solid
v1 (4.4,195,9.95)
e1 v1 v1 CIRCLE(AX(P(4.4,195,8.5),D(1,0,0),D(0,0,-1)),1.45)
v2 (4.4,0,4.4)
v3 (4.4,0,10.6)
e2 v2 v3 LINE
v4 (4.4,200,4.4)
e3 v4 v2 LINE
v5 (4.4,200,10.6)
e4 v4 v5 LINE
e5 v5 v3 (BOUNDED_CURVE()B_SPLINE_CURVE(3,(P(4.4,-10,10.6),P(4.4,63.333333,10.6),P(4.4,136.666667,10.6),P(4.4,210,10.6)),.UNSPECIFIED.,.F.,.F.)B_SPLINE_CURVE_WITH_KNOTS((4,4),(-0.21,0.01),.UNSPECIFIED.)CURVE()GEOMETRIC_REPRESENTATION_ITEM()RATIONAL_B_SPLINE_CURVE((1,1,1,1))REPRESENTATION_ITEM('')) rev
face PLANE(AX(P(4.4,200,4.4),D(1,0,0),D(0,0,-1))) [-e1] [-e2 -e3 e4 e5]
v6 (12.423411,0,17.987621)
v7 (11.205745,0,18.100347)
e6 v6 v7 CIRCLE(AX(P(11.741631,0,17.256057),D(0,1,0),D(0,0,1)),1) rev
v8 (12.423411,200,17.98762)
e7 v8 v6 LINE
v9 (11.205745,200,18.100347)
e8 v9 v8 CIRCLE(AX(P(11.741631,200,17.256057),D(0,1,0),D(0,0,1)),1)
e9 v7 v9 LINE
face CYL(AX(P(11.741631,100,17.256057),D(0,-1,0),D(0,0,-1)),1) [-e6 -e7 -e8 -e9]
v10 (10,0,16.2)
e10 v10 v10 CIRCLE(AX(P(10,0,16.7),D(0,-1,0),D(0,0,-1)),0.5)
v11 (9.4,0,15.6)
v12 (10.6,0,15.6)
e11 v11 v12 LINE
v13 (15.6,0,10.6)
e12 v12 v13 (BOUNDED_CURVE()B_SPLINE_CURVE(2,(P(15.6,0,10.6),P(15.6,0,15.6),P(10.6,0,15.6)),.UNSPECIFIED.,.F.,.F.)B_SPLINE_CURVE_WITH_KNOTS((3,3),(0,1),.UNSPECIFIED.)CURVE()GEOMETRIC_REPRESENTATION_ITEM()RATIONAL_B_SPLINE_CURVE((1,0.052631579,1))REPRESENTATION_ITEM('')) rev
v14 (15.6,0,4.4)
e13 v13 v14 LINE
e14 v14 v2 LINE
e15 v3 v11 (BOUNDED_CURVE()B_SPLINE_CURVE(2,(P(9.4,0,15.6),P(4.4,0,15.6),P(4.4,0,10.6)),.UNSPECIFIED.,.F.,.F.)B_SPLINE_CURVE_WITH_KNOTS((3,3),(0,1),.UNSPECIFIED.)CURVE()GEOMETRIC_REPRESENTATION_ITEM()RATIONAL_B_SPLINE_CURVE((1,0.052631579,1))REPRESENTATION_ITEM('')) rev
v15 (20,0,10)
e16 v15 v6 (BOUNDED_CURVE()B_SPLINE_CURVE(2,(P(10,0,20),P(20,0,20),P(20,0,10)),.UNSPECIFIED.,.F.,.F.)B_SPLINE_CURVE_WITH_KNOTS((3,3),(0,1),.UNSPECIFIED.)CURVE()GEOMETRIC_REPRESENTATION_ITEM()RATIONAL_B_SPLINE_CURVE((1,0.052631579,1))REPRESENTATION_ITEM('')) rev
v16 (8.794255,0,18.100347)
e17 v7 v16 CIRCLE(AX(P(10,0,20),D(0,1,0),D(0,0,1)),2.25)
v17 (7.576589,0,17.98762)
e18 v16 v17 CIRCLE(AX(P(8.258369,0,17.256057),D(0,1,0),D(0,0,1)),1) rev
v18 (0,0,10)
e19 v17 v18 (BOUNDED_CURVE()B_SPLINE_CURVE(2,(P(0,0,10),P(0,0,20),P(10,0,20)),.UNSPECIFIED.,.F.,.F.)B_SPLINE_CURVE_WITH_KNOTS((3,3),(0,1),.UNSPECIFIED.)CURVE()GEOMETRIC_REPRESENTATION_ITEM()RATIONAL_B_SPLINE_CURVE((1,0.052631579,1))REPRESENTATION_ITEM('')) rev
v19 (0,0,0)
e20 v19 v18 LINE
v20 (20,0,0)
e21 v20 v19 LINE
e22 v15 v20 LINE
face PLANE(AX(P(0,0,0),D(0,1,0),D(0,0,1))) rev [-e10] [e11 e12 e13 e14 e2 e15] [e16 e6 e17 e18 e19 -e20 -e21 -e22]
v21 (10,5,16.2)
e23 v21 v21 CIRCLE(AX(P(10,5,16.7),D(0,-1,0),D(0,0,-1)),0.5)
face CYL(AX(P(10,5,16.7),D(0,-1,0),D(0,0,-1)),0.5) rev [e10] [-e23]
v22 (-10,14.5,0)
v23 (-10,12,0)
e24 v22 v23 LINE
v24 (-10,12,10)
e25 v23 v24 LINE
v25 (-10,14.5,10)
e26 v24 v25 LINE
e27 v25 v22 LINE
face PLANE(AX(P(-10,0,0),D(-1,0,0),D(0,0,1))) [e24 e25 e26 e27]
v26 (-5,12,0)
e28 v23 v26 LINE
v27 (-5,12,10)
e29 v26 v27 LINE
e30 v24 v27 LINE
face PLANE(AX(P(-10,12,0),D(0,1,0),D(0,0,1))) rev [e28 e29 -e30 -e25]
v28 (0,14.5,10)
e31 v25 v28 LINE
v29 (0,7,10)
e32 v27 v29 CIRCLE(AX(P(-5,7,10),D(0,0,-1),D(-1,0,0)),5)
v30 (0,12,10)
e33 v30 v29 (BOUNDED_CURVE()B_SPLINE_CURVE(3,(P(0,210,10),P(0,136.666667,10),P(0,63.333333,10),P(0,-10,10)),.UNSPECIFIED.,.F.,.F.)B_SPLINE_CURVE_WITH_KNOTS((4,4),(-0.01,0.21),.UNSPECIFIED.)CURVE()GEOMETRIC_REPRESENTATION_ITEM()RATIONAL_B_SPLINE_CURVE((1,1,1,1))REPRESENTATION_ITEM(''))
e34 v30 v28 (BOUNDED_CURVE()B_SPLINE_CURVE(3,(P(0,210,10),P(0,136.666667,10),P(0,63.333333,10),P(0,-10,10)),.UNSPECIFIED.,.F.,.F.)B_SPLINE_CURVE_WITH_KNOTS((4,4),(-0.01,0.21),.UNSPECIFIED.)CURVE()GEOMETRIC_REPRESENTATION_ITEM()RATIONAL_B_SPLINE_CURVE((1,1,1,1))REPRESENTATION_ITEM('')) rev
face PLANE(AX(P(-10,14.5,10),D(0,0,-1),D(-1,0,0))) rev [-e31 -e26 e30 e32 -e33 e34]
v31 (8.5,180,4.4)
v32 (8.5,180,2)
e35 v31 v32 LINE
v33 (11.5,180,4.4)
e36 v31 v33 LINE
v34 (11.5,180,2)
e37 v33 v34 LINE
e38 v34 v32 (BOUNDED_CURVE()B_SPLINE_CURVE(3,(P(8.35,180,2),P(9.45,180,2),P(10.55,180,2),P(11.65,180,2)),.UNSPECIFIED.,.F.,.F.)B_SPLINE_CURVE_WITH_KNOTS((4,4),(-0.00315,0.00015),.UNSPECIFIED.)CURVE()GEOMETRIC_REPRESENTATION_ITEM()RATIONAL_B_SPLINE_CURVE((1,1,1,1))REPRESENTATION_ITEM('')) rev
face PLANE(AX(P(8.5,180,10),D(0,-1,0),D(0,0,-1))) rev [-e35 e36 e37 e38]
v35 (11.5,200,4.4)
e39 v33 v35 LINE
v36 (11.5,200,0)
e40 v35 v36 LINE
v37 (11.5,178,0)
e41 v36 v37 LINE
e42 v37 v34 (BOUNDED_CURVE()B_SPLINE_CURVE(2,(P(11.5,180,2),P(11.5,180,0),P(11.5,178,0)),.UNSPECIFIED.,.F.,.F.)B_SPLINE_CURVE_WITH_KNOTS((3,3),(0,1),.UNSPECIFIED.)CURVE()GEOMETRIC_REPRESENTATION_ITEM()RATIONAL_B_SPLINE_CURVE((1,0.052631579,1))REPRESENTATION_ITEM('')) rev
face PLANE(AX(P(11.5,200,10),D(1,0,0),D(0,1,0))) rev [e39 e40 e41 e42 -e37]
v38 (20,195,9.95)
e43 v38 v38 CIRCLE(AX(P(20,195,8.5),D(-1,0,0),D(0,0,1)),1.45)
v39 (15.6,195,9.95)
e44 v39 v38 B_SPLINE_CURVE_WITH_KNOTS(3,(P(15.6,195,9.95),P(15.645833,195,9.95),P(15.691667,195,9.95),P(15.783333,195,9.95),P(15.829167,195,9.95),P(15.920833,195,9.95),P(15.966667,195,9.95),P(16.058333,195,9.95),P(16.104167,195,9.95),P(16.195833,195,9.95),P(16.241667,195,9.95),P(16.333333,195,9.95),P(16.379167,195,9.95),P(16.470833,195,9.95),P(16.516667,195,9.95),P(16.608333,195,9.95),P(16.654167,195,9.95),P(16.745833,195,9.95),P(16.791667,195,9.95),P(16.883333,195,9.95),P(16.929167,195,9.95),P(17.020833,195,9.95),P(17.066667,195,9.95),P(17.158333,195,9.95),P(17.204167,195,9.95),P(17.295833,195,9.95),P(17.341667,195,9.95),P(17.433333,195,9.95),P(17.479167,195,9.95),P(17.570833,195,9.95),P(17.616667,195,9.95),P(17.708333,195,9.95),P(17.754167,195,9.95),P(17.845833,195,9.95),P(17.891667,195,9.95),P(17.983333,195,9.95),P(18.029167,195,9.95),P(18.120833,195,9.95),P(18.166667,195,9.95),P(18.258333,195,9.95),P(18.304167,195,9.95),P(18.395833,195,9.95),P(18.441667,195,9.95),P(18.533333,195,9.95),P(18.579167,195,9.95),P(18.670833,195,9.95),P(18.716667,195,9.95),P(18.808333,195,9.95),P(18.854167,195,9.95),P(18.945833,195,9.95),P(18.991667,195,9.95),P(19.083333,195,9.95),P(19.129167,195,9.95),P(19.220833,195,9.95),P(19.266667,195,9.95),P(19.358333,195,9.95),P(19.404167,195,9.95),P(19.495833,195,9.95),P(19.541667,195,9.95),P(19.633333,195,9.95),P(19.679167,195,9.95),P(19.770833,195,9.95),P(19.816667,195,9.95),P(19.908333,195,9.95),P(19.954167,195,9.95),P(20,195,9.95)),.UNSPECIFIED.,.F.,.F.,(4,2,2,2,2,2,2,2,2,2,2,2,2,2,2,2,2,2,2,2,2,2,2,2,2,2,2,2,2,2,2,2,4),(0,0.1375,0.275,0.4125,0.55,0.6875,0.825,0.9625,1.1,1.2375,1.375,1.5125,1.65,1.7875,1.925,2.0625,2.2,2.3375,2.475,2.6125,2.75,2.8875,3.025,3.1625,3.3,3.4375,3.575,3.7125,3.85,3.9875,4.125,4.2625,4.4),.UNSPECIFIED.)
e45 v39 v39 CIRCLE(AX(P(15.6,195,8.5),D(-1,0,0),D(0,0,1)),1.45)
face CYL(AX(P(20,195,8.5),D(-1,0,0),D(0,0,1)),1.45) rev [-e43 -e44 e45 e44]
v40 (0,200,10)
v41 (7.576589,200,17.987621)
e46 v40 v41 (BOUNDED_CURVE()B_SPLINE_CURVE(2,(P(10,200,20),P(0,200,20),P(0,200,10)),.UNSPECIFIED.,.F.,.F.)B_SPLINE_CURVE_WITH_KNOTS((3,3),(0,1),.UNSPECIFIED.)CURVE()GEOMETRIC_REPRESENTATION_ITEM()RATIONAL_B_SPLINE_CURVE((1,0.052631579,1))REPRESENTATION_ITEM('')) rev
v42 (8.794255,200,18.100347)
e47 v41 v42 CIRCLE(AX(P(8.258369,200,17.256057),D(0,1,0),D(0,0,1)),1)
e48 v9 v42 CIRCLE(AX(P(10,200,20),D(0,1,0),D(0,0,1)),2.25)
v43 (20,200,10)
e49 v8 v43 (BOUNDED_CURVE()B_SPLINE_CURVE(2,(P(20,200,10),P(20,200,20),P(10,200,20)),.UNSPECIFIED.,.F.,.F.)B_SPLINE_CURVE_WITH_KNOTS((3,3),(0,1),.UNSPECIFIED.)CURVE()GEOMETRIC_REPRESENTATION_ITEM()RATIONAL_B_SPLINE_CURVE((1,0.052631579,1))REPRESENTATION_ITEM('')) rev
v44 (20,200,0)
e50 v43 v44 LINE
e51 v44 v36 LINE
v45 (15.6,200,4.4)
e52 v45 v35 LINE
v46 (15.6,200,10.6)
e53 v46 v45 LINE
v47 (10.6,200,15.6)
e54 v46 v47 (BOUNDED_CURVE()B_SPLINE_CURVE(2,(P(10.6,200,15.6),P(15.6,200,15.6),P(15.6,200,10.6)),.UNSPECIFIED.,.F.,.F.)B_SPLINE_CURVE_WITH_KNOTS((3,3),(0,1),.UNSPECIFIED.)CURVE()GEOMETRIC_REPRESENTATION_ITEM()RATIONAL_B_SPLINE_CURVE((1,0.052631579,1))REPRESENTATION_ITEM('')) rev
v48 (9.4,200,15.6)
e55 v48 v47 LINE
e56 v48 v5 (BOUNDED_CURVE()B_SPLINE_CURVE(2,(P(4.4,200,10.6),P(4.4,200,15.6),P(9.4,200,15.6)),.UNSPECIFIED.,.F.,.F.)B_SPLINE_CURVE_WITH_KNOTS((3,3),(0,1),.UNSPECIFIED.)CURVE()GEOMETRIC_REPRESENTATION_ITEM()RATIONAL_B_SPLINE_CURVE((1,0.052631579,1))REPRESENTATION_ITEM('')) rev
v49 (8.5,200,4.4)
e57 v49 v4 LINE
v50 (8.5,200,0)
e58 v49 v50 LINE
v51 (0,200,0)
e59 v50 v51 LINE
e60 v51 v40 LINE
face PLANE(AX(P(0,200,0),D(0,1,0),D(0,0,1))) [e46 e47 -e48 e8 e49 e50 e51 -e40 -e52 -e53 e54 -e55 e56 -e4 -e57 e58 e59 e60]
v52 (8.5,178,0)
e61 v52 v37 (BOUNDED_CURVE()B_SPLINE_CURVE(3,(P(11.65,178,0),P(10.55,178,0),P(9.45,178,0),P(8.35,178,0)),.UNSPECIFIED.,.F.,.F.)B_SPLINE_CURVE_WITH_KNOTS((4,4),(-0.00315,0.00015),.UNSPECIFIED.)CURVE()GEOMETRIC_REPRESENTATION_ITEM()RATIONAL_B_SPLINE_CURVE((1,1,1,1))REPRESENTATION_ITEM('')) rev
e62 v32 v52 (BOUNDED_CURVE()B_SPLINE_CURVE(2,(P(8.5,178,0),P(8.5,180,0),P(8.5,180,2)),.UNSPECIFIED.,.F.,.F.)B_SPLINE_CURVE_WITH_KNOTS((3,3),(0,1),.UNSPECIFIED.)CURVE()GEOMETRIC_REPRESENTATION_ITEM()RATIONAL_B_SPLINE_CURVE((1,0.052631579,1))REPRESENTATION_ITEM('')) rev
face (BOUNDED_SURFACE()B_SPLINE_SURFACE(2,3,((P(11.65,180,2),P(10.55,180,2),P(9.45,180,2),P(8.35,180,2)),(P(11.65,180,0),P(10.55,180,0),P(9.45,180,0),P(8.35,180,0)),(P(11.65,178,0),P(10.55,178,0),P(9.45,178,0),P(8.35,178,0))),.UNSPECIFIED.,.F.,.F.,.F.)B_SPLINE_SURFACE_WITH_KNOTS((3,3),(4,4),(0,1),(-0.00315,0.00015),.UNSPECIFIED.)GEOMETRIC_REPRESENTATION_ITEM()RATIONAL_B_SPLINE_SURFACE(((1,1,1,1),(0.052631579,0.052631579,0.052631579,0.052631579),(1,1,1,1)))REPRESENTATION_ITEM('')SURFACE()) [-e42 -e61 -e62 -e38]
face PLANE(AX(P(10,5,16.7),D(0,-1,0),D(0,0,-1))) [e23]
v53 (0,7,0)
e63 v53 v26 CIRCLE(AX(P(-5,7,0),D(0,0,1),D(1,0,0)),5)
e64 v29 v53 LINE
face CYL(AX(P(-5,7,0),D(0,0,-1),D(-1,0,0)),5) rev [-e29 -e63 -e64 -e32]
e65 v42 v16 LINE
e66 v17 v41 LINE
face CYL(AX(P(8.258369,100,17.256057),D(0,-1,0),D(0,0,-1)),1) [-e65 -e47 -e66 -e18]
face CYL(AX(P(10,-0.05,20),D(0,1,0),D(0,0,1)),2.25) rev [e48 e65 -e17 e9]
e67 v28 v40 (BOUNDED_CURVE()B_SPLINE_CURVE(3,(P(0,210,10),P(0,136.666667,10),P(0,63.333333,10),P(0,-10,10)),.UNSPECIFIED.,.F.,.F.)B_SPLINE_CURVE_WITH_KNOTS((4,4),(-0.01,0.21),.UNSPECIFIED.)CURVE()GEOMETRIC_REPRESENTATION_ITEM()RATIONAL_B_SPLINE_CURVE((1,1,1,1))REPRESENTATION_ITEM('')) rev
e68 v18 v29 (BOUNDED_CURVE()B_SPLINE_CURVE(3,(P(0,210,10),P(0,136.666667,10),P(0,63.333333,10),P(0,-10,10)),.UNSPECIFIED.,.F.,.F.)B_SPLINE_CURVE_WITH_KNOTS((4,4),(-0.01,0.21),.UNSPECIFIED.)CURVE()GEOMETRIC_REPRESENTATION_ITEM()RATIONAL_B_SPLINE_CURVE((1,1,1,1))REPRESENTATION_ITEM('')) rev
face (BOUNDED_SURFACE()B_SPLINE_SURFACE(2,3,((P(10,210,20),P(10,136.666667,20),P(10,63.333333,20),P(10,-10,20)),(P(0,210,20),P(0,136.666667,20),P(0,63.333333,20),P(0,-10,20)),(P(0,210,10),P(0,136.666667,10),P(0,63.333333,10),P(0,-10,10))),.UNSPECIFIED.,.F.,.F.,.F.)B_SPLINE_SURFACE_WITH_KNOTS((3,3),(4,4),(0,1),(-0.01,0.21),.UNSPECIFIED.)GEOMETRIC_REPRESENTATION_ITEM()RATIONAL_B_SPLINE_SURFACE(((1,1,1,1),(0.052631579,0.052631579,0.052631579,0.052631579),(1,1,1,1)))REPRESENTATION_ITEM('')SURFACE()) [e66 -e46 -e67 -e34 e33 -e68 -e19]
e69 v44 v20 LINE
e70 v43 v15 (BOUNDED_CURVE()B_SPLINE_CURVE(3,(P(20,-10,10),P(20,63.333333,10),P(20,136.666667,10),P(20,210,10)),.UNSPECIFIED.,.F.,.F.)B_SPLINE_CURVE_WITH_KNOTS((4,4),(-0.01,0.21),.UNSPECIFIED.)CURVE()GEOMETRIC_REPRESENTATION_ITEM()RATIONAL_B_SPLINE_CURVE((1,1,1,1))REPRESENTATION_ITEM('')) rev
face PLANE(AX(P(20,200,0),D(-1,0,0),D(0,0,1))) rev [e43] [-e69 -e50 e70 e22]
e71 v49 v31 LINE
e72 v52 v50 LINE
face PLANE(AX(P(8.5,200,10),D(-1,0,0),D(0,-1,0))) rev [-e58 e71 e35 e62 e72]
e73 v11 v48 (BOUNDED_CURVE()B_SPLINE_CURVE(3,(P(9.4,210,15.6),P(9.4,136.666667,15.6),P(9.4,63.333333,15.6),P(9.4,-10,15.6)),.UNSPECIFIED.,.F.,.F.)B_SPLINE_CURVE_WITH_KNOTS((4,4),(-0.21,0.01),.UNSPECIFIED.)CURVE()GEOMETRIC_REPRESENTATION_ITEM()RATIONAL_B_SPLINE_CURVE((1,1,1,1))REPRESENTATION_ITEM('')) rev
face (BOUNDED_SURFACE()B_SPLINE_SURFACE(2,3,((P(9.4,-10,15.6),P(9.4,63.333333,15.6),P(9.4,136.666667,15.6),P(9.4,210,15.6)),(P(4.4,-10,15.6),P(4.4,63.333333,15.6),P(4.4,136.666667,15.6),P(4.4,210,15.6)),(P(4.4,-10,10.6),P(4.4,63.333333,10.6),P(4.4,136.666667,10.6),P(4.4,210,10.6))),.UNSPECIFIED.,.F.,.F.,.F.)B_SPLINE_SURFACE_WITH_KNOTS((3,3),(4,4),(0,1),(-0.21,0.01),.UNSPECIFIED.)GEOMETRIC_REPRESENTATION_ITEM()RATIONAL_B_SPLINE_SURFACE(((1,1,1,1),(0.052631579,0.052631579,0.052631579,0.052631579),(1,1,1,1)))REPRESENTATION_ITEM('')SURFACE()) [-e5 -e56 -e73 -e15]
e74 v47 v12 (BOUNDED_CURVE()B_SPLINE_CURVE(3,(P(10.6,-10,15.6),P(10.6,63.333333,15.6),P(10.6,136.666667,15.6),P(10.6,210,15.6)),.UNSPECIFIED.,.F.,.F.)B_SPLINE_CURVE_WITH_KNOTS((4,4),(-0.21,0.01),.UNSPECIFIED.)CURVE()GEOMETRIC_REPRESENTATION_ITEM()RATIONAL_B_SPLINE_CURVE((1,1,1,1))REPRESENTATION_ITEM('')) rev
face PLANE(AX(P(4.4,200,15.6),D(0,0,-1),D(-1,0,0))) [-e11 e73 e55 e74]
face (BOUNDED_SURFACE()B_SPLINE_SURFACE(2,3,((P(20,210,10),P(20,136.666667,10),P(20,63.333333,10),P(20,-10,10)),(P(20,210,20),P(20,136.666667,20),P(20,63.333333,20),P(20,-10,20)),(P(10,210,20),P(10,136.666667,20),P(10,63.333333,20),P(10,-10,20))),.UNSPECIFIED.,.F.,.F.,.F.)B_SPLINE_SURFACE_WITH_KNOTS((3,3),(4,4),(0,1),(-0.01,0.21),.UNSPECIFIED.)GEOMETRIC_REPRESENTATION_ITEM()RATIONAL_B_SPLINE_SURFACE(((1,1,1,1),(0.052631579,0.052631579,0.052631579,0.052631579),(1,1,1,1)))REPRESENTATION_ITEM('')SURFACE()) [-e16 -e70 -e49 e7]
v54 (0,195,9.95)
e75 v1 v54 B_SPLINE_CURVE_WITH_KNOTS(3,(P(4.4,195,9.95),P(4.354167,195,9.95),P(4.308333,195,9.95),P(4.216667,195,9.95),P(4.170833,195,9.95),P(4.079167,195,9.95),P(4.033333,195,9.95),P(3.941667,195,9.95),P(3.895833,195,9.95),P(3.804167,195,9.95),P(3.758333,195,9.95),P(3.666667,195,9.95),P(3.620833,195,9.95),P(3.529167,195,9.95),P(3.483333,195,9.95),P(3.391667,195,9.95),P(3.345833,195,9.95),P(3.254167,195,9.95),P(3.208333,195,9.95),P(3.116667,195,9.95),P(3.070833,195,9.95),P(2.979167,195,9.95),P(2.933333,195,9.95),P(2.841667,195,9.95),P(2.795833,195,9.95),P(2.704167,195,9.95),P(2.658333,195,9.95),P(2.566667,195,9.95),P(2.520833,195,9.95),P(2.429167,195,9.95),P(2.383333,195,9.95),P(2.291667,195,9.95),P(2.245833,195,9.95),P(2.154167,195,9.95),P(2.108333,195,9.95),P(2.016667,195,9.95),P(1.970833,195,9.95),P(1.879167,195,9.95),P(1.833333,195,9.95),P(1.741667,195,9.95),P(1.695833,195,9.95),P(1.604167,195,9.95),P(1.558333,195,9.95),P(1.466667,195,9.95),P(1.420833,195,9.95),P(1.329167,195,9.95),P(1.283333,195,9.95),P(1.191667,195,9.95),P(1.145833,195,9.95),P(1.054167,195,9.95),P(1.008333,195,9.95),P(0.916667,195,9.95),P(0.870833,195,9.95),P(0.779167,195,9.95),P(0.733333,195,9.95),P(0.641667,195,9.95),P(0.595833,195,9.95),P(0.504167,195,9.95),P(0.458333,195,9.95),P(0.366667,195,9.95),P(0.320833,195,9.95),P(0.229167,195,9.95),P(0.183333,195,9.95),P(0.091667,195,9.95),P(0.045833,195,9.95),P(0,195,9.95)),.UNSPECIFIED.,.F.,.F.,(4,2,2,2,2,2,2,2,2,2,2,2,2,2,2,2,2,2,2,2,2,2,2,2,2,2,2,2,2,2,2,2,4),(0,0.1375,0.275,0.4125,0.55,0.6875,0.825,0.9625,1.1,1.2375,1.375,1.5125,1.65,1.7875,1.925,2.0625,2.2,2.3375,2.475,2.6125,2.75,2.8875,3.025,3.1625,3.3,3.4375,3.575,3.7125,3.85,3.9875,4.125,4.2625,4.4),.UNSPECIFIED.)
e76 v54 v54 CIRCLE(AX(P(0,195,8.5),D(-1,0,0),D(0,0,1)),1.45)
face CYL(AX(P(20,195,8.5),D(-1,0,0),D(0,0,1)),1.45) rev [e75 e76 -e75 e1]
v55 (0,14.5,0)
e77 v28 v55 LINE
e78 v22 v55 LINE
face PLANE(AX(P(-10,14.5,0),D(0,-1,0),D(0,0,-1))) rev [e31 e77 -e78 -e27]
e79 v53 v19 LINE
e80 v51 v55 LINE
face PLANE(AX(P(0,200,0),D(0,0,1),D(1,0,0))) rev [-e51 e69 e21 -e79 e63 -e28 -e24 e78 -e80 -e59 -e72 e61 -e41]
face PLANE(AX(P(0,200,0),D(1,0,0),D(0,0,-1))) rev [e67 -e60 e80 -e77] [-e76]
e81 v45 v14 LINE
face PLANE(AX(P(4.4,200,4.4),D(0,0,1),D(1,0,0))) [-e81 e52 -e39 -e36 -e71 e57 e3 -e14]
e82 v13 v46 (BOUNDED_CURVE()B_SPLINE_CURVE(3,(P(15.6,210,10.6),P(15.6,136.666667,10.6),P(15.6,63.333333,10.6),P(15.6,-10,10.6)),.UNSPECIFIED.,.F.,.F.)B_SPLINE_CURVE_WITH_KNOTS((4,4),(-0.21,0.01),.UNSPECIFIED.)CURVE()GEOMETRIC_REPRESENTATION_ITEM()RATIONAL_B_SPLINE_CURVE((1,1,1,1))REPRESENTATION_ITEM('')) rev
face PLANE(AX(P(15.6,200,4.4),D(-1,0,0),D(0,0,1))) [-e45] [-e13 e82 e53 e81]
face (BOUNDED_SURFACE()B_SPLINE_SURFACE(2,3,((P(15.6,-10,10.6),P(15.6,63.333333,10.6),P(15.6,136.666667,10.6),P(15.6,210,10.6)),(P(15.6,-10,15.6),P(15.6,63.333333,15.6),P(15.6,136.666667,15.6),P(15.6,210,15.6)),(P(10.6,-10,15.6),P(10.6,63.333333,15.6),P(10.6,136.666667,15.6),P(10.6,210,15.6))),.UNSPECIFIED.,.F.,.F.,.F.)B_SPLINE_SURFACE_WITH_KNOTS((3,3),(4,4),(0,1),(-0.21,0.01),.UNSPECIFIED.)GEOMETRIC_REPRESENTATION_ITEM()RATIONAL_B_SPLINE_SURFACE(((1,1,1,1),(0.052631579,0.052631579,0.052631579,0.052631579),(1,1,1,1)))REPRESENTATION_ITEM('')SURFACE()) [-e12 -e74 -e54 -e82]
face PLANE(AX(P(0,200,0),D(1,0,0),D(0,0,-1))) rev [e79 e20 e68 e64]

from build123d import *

# Parameters (mm, degrees)
SKETCH1_W           = 20
SKETCH1_H           = 20
SKETCH1_W_2         = 11.2
SKETCH1_H_2         = 11.2
BOSS_EXTRUDE1_DEPTH = 200
SKETCH2_R           = 1.45
CUT_EXTRUDE1_DEPTH  = 202.990098767
FILLET3_SIZE        = 5
FILLET4_SIZE        = 10
SKETCH4_R           = 2.25
CUT_EXTRUDE3_DEPTH  = 202.990098886
FILLET6_R           = 1
SKETCH5_W           = 3
SKETCH5_H           = 20
CUT_EXTRUDE4_DEPTH  = 10
FILLET7_START       = 8.5
FILLET7_DEPTH       = 3
SKETCH7_R           = 0.5
CUT_EXTRUDE6_DEPTH  = 5
SKETCH8_W           = 10
SKETCH8_H           = 2.5
BOSS_EXTRUDE2_DEPTH = 10
FILLET8_R           = 5


with BuildPart() as part:
    # Sketch1 → Boss-Extrude1 (new body)
    with BuildSketch(Plane(origin=(0, 0, 0), x_dir=(1, 0, 0), z_dir=(0, 1, 0))):
        with Locations((10, -10)):
            Rectangle(SKETCH1_W, SKETCH1_H)
        with Locations((10, -10)):
            Rectangle(SKETCH1_W_2, SKETCH1_H_2, mode=Mode.SUBTRACT)
    extrude(amount=BOSS_EXTRUDE1_DEPTH)

    # Sketch2 → Cut-Extrude1 (cut, through all)
    with BuildSketch(Plane.ZY):
        with Locations((8.5, 195)):
            Circle(SKETCH2_R)
    extrude(amount=-CUT_EXTRUDE1_DEPTH, mode=Mode.SUBTRACT)

    # Fillet3
    # a fillet whose section is not a circle: 5 mm, written as the material it adds along each edge
    with BuildSketch(Plane(origin=(4.4, 0, 15.6), x_dir=(1, 0, 0), z_dir=(0, 1, 0))) as fillet3_piece_1:
        with BuildLine():
            Bezier((FILLET3_SIZE, 0), (0, 0), (0, FILLET3_SIZE), weights=[1, 0.052631579, 1])
            Line((0, FILLET3_SIZE), (0, 0))
            Line((0, 0), (FILLET3_SIZE, 0))
        make_face()
    extrude(amount=200)
    with BuildSketch(Plane(origin=(15.6, 0, 15.6), x_dir=(-1, 0, 0), z_dir=(0, 1, 0))) as fillet3_piece_2:
        with BuildLine():
            Bezier((FILLET3_SIZE, 0), (0, 0), (0, -FILLET3_SIZE), weights=[1, 0.052631579, 1])
            Line((0, -FILLET3_SIZE), (0, 0))
            Line((0, 0), (FILLET3_SIZE, 0))
        make_face()
    extrude(amount=200)

    # Fillet4
    # a fillet whose section is not a circle: 10 mm, written as the material it takes off along each edge
    with BuildSketch(Plane(origin=(0, -25, 20), x_dir=(0, 0, -1), z_dir=(0, 1, 0)), Plane(origin=(20, -25, 20), x_dir=(-1, 0, 0), z_dir=(0, 1, 0))) as fillet4_piece_1:
        with BuildLine():
            Bezier((FILLET4_SIZE, 0), (0, 0), (0, -FILLET4_SIZE), weights=[1, 0.052631579, 1])
            Line((0, -FILLET4_SIZE), (0, 0))
            Line((0, 0), (FILLET4_SIZE, 0))
        make_face()
    extrude(amount=250, mode=Mode.SUBTRACT)

    # Sketch4 → Cut-Extrude3 (cut, through all)
    with BuildSketch(Plane(origin=(0, 200, 0), x_dir=(1, 0, 0), z_dir=(0, 1, 0))):
        with Locations((10, -20)):
            Circle(SKETCH4_R)
    extrude(amount=-CUT_EXTRUDE3_DEPTH, mode=Mode.SUBTRACT)

    # Fillet6
    fillet6_edges = [part.edges().sort_by_distance(p)[0] for p in [
        (11.759792875, 100, 18.597991071),
        (8.240207125, 100, 18.597991071),
    ]]
    fillet(fillet6_edges, radius=FILLET6_R)

    # Sketch5 → Cut-Extrude4 (cut)
    with BuildSketch(Plane(origin=(0, 0, 0), x_dir=(-1, 0, 0), z_dir=(0, 0, -1))):
        with Locations((-10, 190)):
            Rectangle(SKETCH5_W, SKETCH5_H)
    extrude(amount=-CUT_EXTRUDE4_DEPTH, mode=Mode.SUBTRACT)

    # Fillet7: read off the stored shape, not the designer's step
    # Fillet7 outline → Fillet7 (cut)
    with BuildSketch(Plane.YZ.offset(FILLET7_START)):
        with BuildLine():
            Line((180, 0), (180, 2))
            add(Edge.make_bspline(
                [(180, 2), (180, 0), (178, 0)],
                knots=[0, 0, 0, 1, 1, 1], degree=2, weights=[1, 0.052631579, 1]))
            Line((178, 0), (180, 0))
        make_face()
    extrude(amount=FILLET7_DEPTH, mode=Mode.SUBTRACT)

    # Sketch7 → Cut-Extrude6 (cut)
    with BuildSketch(Plane(origin=(0, 0, 0), x_dir=(-1, 0, 0), z_dir=(0, -1, 0))):
        with Locations(Location((-10, -16.7, 0), (0, 0, 90))):
            Circle(SKETCH7_R)
    extrude(amount=-CUT_EXTRUDE6_DEPTH, mode=Mode.SUBTRACT)

    # Sketch8 → Boss-Extrude2 (add)
    with BuildSketch(Plane.ZY):
        with Locations((5, 13.25)):
            Rectangle(SKETCH8_W, SKETCH8_H)
    extrude(amount=BOSS_EXTRUDE2_DEPTH)

    # Fillet8
    fillet8_edges = [part.edges().sort_by_distance(p)[0] for p in [
        (0, 12, 5),
    ]]
    fillet(fillet8_edges, radius=FILLET8_R)


solid = part.part
